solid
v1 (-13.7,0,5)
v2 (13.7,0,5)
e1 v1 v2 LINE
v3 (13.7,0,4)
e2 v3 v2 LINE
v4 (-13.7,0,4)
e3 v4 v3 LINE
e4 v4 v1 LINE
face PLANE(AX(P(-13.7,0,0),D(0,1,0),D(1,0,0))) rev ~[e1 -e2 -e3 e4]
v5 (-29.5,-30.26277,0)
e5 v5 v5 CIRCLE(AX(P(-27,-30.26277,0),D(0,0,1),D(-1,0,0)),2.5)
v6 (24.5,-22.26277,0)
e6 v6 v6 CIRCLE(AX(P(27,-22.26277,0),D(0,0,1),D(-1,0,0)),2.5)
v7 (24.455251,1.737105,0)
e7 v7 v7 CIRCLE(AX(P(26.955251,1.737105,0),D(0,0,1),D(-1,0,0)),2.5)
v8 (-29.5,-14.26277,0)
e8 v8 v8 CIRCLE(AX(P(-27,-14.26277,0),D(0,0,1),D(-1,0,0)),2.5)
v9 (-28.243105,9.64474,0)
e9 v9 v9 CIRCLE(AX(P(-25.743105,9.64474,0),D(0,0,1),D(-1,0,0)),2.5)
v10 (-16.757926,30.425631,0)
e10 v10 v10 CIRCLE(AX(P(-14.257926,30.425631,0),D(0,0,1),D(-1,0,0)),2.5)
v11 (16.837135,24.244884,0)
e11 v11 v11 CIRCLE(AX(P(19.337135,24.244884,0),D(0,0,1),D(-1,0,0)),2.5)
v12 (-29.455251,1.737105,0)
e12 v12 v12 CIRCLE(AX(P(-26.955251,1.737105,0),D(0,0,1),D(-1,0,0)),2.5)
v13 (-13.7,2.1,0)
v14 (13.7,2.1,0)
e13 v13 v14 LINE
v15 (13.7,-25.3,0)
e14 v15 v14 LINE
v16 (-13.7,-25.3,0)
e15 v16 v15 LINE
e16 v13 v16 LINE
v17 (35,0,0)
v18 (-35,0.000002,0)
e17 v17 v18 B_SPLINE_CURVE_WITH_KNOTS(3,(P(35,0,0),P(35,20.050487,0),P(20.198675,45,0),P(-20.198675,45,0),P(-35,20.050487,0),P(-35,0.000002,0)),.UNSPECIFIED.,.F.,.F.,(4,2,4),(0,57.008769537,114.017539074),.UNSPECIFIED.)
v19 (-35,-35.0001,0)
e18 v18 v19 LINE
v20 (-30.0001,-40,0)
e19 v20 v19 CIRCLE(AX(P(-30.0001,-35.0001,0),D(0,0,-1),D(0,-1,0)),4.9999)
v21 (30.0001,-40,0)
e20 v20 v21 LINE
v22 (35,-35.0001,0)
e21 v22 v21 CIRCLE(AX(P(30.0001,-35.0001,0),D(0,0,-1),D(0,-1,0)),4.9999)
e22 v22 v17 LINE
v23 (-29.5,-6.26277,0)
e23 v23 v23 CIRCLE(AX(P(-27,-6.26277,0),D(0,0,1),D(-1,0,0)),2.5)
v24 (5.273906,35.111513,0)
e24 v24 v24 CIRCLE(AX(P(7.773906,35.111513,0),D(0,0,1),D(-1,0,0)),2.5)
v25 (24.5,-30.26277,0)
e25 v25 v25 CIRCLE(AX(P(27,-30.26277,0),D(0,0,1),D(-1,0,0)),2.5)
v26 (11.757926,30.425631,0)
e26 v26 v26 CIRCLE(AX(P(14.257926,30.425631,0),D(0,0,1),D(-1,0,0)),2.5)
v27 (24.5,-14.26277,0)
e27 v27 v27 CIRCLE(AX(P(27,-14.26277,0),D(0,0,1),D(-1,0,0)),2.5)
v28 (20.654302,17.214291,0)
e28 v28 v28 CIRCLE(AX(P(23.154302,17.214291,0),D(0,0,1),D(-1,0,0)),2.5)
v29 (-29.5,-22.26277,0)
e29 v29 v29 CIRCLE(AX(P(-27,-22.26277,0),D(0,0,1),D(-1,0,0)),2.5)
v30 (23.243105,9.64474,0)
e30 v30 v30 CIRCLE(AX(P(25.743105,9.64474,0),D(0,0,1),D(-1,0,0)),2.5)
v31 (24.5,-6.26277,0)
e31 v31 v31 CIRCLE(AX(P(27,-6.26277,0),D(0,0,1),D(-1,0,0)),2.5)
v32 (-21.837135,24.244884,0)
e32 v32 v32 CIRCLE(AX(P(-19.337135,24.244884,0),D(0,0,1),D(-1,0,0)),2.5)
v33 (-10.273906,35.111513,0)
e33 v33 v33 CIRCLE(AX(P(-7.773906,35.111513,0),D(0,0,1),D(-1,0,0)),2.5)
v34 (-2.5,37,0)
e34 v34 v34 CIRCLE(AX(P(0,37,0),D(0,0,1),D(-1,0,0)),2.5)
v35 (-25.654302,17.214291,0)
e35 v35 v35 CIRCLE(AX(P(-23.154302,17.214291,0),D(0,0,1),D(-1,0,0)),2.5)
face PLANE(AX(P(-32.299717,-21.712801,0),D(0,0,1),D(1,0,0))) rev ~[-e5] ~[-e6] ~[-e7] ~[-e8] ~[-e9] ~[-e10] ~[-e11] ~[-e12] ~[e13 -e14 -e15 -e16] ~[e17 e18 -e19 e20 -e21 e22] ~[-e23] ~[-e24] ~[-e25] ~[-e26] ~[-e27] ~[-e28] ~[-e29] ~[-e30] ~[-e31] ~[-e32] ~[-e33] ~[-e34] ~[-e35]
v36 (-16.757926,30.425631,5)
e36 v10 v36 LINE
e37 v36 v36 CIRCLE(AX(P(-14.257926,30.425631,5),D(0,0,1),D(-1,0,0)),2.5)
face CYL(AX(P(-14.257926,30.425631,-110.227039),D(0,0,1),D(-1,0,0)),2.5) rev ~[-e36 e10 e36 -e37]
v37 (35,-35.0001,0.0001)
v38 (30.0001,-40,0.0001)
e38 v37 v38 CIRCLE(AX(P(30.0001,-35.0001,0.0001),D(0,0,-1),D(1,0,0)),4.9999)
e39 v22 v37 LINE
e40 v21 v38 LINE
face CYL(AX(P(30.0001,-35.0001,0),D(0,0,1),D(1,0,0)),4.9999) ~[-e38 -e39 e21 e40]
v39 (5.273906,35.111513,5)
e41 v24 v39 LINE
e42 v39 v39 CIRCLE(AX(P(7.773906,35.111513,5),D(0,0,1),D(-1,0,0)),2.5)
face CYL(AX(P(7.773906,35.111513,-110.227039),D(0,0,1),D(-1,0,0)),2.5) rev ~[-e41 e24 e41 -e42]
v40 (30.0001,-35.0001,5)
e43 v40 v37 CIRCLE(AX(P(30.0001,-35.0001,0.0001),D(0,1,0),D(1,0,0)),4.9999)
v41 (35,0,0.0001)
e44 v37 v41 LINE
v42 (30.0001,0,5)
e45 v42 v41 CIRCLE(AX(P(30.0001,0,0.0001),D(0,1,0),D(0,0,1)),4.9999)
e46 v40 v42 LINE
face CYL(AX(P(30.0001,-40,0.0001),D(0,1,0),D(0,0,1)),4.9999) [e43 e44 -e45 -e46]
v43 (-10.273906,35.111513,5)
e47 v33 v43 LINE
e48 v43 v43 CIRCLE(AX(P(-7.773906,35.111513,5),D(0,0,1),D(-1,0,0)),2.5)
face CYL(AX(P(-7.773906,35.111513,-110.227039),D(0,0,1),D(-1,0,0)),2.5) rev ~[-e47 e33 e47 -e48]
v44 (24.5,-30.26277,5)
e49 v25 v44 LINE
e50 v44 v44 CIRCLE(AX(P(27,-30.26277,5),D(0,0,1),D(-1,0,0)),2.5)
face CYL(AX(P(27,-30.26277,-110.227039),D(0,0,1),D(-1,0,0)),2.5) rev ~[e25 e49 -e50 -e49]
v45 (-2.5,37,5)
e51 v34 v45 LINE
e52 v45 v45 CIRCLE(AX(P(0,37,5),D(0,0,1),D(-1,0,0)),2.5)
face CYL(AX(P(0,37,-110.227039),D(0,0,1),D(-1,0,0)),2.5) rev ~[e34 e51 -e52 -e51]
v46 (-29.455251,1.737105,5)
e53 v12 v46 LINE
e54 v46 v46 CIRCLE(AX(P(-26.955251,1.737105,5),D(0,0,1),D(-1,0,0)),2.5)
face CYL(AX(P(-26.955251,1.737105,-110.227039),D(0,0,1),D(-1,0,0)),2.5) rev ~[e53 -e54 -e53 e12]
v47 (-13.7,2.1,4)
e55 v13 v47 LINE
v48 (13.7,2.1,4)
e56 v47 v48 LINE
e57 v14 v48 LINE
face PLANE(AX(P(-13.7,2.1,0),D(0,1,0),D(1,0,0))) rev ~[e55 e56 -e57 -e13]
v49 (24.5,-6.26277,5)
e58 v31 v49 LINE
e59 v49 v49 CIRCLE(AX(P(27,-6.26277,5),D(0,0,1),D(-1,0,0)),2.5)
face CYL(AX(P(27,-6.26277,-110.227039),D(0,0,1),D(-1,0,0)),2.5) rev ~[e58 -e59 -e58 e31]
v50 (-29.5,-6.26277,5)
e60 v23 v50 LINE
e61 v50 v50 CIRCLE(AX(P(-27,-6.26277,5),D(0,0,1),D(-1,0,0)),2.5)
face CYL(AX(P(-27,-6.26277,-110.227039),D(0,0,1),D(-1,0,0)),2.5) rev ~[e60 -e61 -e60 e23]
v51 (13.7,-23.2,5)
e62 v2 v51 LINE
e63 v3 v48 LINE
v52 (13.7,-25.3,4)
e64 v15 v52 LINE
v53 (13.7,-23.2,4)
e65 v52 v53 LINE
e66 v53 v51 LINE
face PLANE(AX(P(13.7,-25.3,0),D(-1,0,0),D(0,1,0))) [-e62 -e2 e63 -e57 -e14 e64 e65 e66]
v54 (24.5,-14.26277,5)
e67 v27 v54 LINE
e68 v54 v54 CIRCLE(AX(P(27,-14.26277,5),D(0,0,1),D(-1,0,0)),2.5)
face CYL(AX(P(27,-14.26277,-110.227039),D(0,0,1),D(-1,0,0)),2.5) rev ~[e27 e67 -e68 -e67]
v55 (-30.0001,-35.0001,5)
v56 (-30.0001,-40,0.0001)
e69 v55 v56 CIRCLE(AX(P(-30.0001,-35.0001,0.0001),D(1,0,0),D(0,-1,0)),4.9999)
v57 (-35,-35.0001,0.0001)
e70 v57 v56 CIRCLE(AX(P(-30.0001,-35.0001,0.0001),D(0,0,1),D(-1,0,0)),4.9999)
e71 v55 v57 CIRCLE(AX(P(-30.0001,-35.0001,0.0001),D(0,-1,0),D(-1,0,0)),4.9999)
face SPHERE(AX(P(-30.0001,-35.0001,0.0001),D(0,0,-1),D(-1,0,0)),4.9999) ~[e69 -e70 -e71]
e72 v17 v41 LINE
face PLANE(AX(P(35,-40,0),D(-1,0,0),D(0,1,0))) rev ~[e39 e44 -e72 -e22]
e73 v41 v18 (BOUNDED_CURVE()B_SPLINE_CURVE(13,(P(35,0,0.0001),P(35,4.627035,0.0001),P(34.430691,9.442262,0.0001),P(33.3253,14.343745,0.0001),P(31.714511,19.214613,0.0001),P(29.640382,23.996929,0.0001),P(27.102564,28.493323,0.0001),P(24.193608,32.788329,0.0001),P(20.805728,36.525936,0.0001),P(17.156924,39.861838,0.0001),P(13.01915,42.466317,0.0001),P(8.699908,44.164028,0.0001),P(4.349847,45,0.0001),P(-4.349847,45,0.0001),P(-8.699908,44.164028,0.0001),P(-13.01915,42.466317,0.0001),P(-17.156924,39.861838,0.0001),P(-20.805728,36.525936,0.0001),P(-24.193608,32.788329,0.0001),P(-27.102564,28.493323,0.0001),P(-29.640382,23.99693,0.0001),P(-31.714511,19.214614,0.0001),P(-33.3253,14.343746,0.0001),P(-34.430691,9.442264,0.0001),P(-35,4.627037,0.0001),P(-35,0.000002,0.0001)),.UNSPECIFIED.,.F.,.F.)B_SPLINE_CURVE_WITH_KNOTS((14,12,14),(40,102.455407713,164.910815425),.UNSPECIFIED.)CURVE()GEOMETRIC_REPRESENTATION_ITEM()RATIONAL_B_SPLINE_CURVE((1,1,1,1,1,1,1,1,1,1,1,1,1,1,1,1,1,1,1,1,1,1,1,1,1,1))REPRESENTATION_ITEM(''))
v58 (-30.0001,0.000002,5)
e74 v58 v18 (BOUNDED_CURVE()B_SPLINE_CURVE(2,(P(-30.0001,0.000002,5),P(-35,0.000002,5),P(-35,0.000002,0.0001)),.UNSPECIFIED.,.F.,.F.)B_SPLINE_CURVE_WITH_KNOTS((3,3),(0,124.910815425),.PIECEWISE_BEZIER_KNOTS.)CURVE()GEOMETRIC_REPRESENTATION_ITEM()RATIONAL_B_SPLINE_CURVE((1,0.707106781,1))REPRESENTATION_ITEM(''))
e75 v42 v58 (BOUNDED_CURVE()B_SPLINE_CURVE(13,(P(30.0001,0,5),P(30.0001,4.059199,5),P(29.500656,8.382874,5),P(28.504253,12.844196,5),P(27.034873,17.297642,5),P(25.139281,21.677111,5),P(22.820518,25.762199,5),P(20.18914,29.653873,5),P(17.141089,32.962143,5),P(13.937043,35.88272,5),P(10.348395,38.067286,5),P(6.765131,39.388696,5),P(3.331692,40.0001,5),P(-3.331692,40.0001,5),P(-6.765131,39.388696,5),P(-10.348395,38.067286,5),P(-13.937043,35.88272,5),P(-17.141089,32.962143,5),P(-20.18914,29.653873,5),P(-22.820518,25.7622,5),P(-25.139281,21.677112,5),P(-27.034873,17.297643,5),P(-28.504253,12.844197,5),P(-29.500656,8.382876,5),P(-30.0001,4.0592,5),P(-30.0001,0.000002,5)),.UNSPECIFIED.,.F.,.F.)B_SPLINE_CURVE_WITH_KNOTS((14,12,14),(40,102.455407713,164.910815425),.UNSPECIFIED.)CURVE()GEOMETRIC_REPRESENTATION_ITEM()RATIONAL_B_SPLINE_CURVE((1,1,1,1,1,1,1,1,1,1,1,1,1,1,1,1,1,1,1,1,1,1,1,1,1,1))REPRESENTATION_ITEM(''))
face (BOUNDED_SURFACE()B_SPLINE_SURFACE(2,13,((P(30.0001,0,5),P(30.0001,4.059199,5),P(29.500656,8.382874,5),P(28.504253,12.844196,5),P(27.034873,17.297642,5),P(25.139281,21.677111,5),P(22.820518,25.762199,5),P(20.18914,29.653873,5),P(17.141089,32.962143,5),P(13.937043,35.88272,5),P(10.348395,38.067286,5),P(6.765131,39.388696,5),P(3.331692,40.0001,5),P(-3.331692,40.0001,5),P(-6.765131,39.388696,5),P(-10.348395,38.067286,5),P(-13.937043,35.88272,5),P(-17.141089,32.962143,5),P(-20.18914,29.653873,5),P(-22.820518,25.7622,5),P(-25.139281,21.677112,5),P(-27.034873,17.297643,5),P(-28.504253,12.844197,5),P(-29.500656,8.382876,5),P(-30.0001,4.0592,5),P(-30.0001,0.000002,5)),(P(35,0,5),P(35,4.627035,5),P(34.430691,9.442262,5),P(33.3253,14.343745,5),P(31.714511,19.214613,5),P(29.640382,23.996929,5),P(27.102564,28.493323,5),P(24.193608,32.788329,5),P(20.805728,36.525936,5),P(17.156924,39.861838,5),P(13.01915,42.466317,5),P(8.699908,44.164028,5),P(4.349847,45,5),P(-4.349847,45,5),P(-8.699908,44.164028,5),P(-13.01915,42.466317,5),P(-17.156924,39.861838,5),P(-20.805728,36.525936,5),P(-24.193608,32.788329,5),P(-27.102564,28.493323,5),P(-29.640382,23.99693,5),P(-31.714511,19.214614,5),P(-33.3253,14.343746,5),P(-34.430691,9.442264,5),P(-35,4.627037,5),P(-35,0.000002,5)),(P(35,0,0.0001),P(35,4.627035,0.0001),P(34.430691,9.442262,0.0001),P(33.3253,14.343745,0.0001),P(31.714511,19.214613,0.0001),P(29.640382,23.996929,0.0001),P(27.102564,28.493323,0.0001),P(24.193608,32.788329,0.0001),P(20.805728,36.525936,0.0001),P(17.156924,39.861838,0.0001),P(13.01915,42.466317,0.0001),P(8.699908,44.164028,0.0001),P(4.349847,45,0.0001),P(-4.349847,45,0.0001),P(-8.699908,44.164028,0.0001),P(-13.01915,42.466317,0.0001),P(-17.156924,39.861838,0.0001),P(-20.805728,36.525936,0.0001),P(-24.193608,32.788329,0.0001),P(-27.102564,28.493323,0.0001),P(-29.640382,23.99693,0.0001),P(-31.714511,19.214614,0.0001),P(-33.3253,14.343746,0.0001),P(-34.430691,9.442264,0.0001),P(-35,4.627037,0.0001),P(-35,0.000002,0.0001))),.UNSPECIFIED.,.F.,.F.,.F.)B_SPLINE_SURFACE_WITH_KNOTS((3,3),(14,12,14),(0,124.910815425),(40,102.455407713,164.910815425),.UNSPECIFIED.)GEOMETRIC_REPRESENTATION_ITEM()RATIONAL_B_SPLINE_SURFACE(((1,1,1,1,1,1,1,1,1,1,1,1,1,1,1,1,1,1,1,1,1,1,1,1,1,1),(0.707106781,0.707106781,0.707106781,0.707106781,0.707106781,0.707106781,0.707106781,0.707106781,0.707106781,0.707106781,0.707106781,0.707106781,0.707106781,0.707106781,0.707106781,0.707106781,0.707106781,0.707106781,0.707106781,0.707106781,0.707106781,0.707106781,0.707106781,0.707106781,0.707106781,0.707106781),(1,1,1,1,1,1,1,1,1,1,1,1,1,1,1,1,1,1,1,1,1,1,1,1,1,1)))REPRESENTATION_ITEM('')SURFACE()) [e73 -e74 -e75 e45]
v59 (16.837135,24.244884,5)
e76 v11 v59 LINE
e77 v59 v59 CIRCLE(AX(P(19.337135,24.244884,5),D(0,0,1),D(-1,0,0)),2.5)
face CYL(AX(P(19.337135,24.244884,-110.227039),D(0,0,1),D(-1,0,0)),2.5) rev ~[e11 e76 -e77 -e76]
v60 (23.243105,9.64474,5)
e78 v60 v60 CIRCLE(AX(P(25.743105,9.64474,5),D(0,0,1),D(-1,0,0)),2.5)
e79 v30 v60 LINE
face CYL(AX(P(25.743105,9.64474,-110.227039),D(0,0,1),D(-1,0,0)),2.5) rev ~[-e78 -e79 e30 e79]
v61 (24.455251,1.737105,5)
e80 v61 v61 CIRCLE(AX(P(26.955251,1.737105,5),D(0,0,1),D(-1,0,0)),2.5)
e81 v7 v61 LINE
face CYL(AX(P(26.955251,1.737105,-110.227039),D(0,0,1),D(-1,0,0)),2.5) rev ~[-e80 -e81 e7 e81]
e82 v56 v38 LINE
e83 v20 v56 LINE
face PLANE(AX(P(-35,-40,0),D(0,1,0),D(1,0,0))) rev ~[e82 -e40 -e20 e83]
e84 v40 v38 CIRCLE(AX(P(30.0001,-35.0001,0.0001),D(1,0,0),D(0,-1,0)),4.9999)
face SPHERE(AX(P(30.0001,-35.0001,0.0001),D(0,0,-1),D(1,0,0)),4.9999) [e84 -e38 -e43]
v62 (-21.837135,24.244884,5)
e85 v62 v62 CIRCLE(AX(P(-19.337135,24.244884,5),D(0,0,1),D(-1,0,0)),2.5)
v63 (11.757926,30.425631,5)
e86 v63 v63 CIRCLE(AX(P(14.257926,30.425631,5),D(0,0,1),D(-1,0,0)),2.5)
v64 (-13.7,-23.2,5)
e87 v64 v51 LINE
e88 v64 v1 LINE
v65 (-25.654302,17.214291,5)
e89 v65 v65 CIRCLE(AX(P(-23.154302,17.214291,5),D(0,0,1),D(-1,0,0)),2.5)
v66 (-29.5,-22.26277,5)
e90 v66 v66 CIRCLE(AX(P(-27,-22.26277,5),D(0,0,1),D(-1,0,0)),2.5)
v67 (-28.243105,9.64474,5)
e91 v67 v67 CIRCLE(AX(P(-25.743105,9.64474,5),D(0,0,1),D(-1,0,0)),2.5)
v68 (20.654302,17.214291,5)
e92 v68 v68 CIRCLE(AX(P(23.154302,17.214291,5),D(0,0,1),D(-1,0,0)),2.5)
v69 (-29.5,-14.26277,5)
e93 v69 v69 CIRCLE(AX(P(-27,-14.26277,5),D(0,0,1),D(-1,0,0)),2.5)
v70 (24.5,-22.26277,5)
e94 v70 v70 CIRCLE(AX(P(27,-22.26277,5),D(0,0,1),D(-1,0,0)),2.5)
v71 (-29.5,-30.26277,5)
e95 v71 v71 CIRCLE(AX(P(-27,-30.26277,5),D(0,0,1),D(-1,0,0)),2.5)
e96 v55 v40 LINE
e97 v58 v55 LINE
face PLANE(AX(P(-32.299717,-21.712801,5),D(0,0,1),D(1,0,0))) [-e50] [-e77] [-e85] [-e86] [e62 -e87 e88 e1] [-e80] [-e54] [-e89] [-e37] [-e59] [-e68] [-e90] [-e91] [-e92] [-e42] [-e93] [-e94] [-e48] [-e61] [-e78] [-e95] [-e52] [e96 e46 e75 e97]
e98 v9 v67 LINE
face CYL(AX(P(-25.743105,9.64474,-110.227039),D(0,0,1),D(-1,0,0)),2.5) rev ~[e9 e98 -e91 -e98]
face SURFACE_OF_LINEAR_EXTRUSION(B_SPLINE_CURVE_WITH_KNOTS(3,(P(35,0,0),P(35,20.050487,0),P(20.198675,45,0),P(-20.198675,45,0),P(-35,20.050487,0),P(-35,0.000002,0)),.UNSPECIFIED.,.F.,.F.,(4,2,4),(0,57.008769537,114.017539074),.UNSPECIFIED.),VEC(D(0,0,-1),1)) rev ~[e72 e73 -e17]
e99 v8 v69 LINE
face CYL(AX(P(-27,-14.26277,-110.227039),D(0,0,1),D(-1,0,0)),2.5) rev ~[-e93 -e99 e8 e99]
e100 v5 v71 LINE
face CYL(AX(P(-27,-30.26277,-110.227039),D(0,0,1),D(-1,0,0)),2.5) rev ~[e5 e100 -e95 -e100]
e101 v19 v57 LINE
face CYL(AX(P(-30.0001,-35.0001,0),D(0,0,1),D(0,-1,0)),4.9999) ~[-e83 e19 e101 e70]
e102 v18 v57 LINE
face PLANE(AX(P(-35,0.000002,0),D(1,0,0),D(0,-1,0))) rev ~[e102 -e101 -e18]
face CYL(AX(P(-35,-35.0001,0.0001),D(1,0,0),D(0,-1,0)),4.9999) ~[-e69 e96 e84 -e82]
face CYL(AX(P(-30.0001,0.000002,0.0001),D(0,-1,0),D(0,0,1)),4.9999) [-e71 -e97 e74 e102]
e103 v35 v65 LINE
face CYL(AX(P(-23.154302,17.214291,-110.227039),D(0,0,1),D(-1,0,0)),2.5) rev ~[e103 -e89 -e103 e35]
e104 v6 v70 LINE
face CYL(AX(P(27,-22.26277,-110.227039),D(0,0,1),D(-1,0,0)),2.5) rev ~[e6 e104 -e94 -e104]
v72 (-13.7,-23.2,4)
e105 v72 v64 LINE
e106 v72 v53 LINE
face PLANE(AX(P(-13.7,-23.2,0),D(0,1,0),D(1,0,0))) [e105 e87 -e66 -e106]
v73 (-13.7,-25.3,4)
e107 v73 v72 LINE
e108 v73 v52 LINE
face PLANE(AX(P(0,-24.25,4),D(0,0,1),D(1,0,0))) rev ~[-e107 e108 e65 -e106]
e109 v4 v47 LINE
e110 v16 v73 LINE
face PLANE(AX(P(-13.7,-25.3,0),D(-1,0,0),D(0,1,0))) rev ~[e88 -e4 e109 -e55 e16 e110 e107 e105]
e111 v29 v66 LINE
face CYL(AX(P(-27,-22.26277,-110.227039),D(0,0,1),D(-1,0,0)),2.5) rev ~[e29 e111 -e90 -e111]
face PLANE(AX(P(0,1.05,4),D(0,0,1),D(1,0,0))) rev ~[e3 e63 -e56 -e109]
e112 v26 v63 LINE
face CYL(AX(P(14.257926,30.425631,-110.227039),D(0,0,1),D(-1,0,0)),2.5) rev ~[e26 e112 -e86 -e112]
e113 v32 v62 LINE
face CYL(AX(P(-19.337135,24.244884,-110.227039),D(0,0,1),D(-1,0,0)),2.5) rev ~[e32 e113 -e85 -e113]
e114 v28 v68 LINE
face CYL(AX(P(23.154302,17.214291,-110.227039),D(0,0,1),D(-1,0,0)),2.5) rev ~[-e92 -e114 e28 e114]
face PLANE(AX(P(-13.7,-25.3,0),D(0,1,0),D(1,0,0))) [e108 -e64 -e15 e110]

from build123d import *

# Parameters (mm, degrees)
F0_W     = 27.4
F0_H     = 2.1
F1_DEPTH = 5
F2_DEPTH = 4
F3_D     = 5
F4_R     = 4.9999


# Not quite as in the source:
# - a fillet or chamfer is up to 0.001 mm smaller than in the source, because OpenCascade refuses the exact size
# - ends of sketch curves that miss each other by under 0.0002 mm in the source are joined
# - a feature names something its author has since deleted; it is built from what else it names


with BuildPart() as f1:
    # F0 (on Top) → F1 (new body)
    with BuildSketch(Plane.XY):
        with BuildLine():
            Line((-35, 2.1762e-06), (-35, -40))
            Line((-35, -40), (-27, -40))
            Line((-27, -40), (-27, -22.2710574513))
            ThreePointArc((-27, -22.2710574513), (-32.9393385518, -11.8321585422), (-35, 2.1762e-06))
        make_face()
        with BuildLine():
            Line((-27, -22.2710574513), (-27, -40))
            Line((-27, -40), (27, -40))
            Line((27, -40), (27, -22.2710574513))
            ThreePointArc((27, -22.2710574513), (0, -35), (-27, -22.2710574513))
        make_face()
        with BuildLine():
            add(Edge.make_bspline(
                [(0, 45), (-20.1986748725, 45), (-35, 20.0504870868), (-35, 2.1762e-06)],
                knots=[0, 0, 0, 0, 57.0087695372, 57.0087695372, 57.0087695372, 57.0087695372], degree=3))
            ThreePointArc((-35, 2.1762e-06), (-28.4666369261, 20.3629708568), (-11.3056830814, 33.1237306181))
            add(Edge.make_bspline(
                [(0, 37), (-0.2833414452, 37.0069688983), (-1.1232932293, 37.0068386903), (-2.7957299856, 36.8864035146), (-4.9942322029, 36.3521195303), (-7.6997383876, 35.2871018647), (-9.7958540485, 34.148638444), (-11.0540635502, 33.3003360386), (-11.3056830814, 33.1237306181)],
                knots=[0, 0, 0, 0, 0.8506820357, 2.5185967411, 5.0181648841, 7.6012051941, 11.2266191262, 12.1476935207, 12.1476935207, 12.1476935207, 12.1476935207], degree=3))
            add(Edge.make_bspline(
                [(0, 37), (0.2833414452, 37.0069688983), (1.1232932293, 37.0068386903), (2.7957299856, 36.8864035146), (4.9942322029, 36.3521195303), (7.6997383876, 35.2871018647), (9.7958540485, 34.148638444), (11.0540635502, 33.3003360386), (11.3056830814, 33.1237306181)],
                knots=[0, 0, 0, 0, 0.8506820357, 2.5185967411, 5.0181648841, 7.6012051941, 11.2266191262, 12.1476935207, 12.1476935207, 12.1476935207, 12.1476935207], degree=3))
            ThreePointArc((11.3056830814, 33.1237306181), (28.4666375592, 20.3629699719), (35, 0))
            add(Edge.make_bspline(
                [(0, 45), (20.1986748725, 45), (35, 20.0504870868), (35, 0)],
                knots=[0, 0, 0, 0, 57.0087695372, 57.0087695372, 57.0087695372, 57.0087695372], degree=3))
        make_face()
        with BuildLine():
            ThreePointArc((-11.3056830814, 33.1237306181), (-28.4666369261, 20.3629708568), (-35, 2.1762e-06))
            ThreePointArc((-35, 2.1762e-06), (-32.9393385518, -11.8321585422), (-27, -22.2710574513))
            Line((-27, -22.2710574513), (-27, 2.1762e-06))
            add(Edge.make_bspline(
                [(-11.3056830814, 33.1237306181), (-12.4097508436, 32.3488132243), (-15.1414824386, 30.0752135158), (-18.8876274503, 25.5283101279), (-22.422035633, 19.604279738), (-25.0662594291, 13.1120426553), (-26.6478130576, 7.1844788974), (-27.0173066601, 2.7756083867), (-27.018694794, 0.6711028041), (-27, 2.1762e-06)],
                knots=[12.1476935207, 12.1476935207, 12.1476935207, 12.1476935207, 16.189226149, 22.7543847852, 29.7183326598, 36.8091409701, 43.7289829573, 48.0262708445, 50.0404462243, 50.0404462243, 50.0404462243, 50.0404462243], degree=3))
        make_face()
        with BuildLine():
            Line((27, -22.2710574513), (27, -40))
            Line((27, -40), (35, -40))
            Line((35, -40), (35, 0))
            ThreePointArc((35, 0), (32.939338184, -11.8321595662), (27, -22.2710574513))
        make_face()
        with BuildLine():
            Line((27, 2.1762e-06), (27, -22.2710574513))
            ThreePointArc((27, -22.2710574513), (32.939338184, -11.8321595662), (35, 0))
            ThreePointArc((35, 0), (28.4666375592, 20.3629699719), (11.3056830814, 33.1237306181))
            add(Edge.make_bspline(
                [(11.3056830814, 33.1237306181), (12.4097508436, 32.3488132243), (15.1414824386, 30.0752135158), (18.8876274503, 25.5283101279), (22.422035633, 19.604279738), (25.0662594291, 13.1120426553), (26.6478130576, 7.1844788974), (27.0173066601, 2.7756083867), (27.018694794, 0.6711028041), (27, 2.1762e-06)],
                knots=[12.1476935207, 12.1476935207, 12.1476935207, 12.1476935207, 16.189226149, 22.7543847852, 29.7183326598, 36.8091409701, 43.7289829573, 48.0262708445, 50.0404462243, 50.0404462243, 50.0404462243, 50.0404462243], degree=3))
        make_face()
        with BuildLine():
            add(Edge.make_bspline(
                [(0, 37), (-0.2833414452, 37.0069688983), (-1.1232932293, 37.0068386903), (-2.7957299856, 36.8864035146), (-4.9942322029, 36.3521195303), (-7.6997383876, 35.2871018647), (-9.7958540485, 34.148638444), (-11.0540635502, 33.3003360386), (-11.3056830814, 33.1237306181)],
                knots=[0, 0, 0, 0, 0.8506820357, 2.5185967411, 5.0181648841, 7.6012051941, 11.2266191262, 12.1476935207, 12.1476935207, 12.1476935207, 12.1476935207], degree=3))
            ThreePointArc((-11.3056830814, 33.1237306181), (0, 35), (11.3056830814, 33.1237306181))
            add(Edge.make_bspline(
                [(0, 37), (0.2833414452, 37.0069688983), (1.1232932293, 37.0068386903), (2.7957299856, 36.8864035146), (4.9942322029, 36.3521195303), (7.6997383876, 35.2871018647), (9.7958540485, 34.148638444), (11.0540635502, 33.3003360386), (11.3056830814, 33.1237306181)],
                knots=[0, 0, 0, 0, 0.8506820357, 2.5185967411, 5.0181648841, 7.6012051941, 11.2266191262, 12.1476935207, 12.1476935207, 12.1476935207, 12.1476935207], degree=3))
        make_face()
        with BuildLine():
            Line((-27, 2.1762e-06), (-27, -22.2710574513))
            ThreePointArc((-27, -22.2710574513), (0, -35), (27, -22.2710574513))
            Line((27, -22.2710574513), (27, 2.1762e-06))
            add(Edge.make_bspline(
                [(11.3056830814, 33.1237306181), (12.4097508436, 32.3488132243), (15.1414824386, 30.0752135158), (18.8876274503, 25.5283101279), (22.422035633, 19.604279738), (25.0662594291, 13.1120426553), (26.6478130576, 7.1844788974), (27.0173066601, 2.7756083867), (27.018694794, 0.6711028041), (27, 2.1762e-06)],
                knots=[12.1476935207, 12.1476935207, 12.1476935207, 12.1476935207, 16.189226149, 22.7543847852, 29.7183326598, 36.8091409701, 43.7289829573, 48.0262708445, 50.0404462243, 50.0404462243, 50.0404462243, 50.0404462243], degree=3))
            ThreePointArc((11.3056830814, 33.1237306181), (0, 35), (-11.3056830814, 33.1237306181))
            add(Edge.make_bspline(
                [(-11.3056830814, 33.1237306181), (-12.4097508436, 32.3488132243), (-15.1414824386, 30.0752135158), (-18.8876274503, 25.5283101279), (-22.422035633, 19.604279738), (-25.0662594291, 13.1120426553), (-26.6478130576, 7.1844788974), (-27.0173066601, 2.7756083867), (-27.018694794, 0.6711028041), (-27, 2.1762e-06)],
                knots=[12.1476935207, 12.1476935207, 12.1476935207, 12.1476935207, 16.189226149, 22.7543847852, 29.7183326598, 36.8091409701, 43.7289829573, 48.0262708445, 50.0404462243, 50.0404462243, 50.0404462243, 50.0404462243], degree=3))
        make_face()
        Polygon((-13.7, -23.2), (-13.7, 0), (-13.7, 2.1), (13.7, 2.1), (13.7, 0), (13.7, -23.2), (13.7, -25.3), (-13.7, -25.3), align=None, mode=Mode.SUBTRACT)
        with Locations((0, 1.05)):
            Rectangle(F0_W, F0_H)
        with Locations((0, -24.25)):
            Rectangle(F0_W, F0_H)
    extrude(amount=F1_DEPTH)

    # F0 (on Top) → F2 (cut)
    with BuildSketch(Plane.XY):
        with Locations((0, 1.05)):
            Rectangle(F0_W, F0_H)
        with Locations((0, -24.25)):
            Rectangle(F0_W, F0_H)
    extrude(amount=F2_DEPTH, mode=Mode.SUBTRACT)

    # F3 (through all)
    with Locations(Plane(origin=(0, 0, 0), x_dir=(1, 0, 0), z_dir=(0, 0, -1))):
        with Locations((0, -37), (-7.7739062126, -35.111513252), (-14.2579257305, -30.4256311694), (-19.3371352018, -24.244884358), (-23.1543015859, -17.2142911543), (-25.7431047524, -9.6447404302), (-26.9552512695, -1.7371048277), (-27, 6.2627700182), (-27, 14.2627700182), (-27, 22.2627700182), (7.7739062126, -35.111513252), (14.2579257305, -30.4256311694), (19.3371352018, -24.244884358), (23.1543015859, -17.2142911543), (25.7431047524, -9.6447404302), (26.9552512695, -1.7371048277), (27, 6.2627700182), (27, 14.2627700182), (27, 22.2627700182), (-27, 30.2627700182), (27, 30.2627700182)):
            Hole(F3_D / 2)

    # F4 (radius 5 in the source; OpenCascade refuses exactly that, so slightly less here)
    f4_edges = [f1.edges().sort_by_distance(p)[0] for p in [
        (-35, -40, 2.5),
        (35, -40, 2.5),
        (-35, -19.999999, 5),
        (0, -40, 5),
    ]]
    fillet(f4_edges, radius=F4_R)


solid = f1.part
